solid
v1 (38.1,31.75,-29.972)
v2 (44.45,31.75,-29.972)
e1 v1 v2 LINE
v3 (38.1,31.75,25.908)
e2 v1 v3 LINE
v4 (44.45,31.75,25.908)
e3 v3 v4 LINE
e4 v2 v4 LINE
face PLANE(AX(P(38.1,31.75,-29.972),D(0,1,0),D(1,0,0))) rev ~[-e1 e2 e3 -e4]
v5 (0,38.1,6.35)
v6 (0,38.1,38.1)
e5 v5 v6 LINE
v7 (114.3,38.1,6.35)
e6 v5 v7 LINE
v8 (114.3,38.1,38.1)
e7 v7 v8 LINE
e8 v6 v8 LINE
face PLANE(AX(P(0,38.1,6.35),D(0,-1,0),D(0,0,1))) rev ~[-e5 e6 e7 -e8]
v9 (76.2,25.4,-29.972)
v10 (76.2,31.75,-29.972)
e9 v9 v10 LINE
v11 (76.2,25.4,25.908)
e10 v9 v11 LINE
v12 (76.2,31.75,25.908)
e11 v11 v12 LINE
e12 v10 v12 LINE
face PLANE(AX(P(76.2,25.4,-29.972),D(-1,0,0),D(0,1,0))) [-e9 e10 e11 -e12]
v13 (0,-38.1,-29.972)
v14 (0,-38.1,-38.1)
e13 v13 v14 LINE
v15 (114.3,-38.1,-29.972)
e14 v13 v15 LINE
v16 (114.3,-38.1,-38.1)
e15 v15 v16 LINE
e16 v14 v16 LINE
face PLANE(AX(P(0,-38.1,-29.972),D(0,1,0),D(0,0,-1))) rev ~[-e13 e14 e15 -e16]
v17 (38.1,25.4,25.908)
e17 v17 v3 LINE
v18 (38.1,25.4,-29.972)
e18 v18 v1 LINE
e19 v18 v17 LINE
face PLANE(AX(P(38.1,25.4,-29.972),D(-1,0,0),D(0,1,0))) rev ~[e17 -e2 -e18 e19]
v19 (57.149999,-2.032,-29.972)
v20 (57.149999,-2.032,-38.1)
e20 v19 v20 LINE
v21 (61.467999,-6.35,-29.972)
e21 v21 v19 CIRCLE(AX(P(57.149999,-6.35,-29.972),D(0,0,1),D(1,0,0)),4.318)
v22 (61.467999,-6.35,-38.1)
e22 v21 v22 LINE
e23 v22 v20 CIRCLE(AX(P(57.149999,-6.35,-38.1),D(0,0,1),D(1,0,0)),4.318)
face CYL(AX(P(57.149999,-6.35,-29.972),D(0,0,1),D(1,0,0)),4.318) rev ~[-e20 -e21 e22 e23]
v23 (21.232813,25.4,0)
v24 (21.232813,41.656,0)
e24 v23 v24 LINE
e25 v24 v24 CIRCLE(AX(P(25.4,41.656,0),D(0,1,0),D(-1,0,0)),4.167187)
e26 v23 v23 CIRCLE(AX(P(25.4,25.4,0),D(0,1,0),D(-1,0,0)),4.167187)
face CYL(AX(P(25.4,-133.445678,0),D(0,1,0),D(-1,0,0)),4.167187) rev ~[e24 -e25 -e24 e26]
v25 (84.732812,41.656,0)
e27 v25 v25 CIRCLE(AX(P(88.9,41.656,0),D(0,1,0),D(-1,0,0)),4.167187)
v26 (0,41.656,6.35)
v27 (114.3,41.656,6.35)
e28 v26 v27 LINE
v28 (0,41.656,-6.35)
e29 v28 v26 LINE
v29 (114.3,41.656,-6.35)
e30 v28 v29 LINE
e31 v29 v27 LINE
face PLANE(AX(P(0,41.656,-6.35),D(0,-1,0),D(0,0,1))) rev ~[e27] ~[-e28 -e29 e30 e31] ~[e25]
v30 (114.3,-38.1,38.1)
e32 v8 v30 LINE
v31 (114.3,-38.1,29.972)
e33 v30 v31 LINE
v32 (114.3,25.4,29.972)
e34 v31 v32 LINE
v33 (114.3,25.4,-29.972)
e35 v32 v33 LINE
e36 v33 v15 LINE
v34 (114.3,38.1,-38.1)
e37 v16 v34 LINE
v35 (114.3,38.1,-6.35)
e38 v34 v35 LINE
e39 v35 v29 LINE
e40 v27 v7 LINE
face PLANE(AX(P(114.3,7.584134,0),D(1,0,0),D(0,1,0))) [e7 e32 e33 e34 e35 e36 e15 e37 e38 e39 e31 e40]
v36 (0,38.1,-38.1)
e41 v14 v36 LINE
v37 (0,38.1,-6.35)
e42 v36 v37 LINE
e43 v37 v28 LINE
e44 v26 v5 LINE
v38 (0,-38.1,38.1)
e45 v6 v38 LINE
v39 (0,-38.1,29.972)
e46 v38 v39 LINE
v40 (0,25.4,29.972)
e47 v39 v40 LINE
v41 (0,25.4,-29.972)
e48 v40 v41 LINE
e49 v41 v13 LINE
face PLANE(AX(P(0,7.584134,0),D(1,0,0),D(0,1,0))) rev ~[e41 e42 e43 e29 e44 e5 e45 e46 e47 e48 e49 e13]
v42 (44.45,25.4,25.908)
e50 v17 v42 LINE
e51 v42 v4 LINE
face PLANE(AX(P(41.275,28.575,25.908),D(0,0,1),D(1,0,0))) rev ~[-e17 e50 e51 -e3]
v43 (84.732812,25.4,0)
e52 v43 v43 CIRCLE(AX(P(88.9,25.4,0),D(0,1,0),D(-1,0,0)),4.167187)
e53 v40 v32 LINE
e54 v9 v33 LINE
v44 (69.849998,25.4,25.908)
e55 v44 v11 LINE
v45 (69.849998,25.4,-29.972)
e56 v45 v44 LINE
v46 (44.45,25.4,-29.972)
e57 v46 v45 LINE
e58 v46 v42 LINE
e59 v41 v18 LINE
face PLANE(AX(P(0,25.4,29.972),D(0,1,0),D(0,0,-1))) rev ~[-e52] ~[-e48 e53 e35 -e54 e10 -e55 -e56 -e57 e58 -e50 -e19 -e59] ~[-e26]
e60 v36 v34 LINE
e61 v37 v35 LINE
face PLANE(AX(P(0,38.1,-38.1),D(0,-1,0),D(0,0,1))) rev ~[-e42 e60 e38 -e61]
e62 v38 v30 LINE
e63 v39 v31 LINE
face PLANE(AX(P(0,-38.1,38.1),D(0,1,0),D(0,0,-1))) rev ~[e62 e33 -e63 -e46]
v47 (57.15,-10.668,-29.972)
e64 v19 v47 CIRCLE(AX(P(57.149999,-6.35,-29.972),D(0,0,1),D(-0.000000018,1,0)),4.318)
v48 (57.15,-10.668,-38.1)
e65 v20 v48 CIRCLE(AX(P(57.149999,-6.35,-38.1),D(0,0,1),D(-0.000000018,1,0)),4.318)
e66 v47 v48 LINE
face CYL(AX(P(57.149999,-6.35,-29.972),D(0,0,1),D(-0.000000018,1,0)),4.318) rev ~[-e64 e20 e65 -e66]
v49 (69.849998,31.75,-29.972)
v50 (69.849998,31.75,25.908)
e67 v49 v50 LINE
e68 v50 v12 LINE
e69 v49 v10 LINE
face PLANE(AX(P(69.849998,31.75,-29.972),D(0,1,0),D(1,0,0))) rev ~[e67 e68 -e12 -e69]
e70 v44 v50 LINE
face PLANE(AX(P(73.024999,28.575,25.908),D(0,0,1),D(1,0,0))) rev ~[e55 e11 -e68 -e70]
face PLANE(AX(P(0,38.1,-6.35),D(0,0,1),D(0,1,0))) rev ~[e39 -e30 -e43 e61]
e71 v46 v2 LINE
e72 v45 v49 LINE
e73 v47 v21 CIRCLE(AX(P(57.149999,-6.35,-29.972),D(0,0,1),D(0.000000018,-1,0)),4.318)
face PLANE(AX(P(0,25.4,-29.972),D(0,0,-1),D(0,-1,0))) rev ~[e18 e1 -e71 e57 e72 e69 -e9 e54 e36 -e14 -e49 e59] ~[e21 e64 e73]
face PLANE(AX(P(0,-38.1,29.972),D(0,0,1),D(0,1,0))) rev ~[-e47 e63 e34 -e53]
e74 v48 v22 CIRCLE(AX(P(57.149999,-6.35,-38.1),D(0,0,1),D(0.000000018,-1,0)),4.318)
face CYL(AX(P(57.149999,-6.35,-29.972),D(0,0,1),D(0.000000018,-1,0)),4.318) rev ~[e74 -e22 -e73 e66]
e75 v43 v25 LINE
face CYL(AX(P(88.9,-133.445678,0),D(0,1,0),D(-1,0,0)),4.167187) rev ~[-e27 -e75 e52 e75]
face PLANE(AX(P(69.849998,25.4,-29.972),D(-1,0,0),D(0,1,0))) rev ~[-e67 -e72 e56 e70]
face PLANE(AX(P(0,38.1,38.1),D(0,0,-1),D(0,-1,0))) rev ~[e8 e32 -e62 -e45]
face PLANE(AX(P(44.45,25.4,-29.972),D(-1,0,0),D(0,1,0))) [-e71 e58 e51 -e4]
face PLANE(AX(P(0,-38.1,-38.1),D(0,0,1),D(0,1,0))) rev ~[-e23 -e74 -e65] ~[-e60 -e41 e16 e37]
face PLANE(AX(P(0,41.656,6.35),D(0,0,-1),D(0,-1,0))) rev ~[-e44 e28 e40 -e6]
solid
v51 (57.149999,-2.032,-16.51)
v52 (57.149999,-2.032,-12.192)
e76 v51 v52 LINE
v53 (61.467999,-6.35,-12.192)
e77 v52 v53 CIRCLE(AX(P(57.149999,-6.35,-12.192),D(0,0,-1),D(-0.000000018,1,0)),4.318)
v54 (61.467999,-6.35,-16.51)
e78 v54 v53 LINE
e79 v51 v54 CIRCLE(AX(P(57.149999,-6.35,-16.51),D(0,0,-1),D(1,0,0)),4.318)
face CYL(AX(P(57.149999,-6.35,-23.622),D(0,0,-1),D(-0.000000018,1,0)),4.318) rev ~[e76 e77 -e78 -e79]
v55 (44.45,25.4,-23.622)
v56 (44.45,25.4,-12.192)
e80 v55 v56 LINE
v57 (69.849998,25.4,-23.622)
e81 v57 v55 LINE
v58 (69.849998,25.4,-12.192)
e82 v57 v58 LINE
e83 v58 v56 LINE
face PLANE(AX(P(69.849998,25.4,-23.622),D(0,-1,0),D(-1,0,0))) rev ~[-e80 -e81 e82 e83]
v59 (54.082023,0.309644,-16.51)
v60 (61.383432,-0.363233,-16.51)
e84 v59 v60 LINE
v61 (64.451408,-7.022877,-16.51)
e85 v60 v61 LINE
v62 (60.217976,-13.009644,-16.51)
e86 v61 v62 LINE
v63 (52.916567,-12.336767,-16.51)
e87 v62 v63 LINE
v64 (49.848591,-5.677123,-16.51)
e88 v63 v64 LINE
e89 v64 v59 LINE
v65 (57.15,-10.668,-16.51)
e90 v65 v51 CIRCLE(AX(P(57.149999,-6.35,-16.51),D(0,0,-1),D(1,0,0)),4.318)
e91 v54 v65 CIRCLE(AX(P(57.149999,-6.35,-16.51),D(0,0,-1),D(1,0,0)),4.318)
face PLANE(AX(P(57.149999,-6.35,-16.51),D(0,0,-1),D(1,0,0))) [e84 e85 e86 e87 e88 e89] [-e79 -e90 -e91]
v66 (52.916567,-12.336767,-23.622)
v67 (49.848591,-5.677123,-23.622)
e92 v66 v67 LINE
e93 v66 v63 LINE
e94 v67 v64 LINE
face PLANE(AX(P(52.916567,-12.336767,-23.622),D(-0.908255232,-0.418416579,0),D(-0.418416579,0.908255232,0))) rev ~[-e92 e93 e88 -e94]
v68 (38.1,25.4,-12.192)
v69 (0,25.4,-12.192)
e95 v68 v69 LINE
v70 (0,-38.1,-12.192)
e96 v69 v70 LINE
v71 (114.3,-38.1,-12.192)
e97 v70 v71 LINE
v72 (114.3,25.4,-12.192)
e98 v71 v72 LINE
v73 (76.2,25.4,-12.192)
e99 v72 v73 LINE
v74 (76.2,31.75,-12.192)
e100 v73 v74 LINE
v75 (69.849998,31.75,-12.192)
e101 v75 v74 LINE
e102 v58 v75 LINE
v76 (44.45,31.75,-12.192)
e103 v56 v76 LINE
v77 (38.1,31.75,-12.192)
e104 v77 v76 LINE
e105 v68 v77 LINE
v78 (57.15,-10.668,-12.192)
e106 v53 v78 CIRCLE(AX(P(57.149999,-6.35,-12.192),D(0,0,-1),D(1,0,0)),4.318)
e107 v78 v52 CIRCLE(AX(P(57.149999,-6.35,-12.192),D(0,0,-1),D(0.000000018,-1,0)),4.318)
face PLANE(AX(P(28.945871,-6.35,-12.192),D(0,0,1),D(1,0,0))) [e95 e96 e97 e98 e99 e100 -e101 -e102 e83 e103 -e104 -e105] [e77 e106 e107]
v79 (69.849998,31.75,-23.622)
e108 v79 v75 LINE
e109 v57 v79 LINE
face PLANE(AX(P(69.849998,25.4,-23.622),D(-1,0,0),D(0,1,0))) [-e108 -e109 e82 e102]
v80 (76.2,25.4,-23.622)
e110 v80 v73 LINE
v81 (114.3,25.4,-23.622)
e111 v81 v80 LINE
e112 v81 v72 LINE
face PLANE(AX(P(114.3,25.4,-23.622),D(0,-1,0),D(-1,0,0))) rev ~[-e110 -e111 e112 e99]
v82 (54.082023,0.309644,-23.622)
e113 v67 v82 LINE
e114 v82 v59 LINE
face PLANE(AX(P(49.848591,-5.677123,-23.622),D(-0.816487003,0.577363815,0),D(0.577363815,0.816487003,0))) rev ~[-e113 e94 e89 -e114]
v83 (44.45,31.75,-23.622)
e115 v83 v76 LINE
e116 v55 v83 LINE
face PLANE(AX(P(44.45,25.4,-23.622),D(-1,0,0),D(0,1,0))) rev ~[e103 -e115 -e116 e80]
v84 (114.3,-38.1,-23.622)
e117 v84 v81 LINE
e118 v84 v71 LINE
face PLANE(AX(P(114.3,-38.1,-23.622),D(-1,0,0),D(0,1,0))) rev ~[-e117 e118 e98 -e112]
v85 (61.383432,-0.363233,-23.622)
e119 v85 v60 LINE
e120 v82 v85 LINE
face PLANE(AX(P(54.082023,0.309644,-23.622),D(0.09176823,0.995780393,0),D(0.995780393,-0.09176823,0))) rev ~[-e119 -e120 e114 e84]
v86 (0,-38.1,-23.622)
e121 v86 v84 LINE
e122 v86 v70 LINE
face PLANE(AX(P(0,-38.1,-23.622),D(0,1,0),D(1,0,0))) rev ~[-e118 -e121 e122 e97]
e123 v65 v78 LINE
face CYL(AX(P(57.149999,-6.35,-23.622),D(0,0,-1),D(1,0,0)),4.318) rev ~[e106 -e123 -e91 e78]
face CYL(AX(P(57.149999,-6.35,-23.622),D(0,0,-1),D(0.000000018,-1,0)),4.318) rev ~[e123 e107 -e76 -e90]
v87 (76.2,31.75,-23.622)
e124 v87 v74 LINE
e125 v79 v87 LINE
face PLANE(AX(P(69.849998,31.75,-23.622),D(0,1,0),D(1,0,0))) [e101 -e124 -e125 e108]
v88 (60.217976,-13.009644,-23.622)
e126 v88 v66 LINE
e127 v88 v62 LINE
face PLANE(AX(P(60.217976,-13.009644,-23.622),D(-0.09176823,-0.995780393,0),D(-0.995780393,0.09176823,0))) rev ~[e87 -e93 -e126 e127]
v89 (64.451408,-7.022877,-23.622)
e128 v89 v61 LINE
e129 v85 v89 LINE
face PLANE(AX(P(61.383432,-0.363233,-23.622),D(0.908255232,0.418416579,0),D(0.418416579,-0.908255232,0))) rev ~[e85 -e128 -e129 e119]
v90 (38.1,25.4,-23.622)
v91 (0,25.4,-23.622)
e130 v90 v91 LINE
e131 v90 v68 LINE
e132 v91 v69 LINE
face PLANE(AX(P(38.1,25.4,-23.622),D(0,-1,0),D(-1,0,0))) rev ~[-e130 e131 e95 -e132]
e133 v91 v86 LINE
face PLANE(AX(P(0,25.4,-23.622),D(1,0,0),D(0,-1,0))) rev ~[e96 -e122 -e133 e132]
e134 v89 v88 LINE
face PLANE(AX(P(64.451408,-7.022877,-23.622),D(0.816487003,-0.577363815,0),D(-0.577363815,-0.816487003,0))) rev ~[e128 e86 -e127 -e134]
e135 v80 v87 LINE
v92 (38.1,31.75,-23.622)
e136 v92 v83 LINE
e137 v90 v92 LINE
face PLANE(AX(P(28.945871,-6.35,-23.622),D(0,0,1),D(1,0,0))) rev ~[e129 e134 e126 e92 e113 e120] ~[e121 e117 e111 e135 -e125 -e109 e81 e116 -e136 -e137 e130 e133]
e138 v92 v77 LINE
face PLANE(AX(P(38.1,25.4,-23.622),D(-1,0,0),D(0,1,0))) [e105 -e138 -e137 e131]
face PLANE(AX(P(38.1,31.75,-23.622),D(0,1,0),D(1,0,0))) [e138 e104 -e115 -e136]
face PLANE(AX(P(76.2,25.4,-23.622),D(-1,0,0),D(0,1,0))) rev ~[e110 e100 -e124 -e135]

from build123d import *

# Parameters (mm, degrees)
F1_DEPTH = 114.3
F3_D     = 8.334375
F5_DEPTH = 12.7
F4_W     = 6.35
F4_H     = 6.35
F4_W_2   = 6.3500022411
F6_DEPTH = 55.88
F7_START = 6.35
F7_DEPTH = 11.43
F8_R     = 4.318
F9_DEPTH = 7.112


# Not quite as in the source:
# - a length typed as a fraction of an inch, garbled in the dataset ("3 / 203.2 mm" for 3/8 in), is restored


with BuildPart() as f1:
    # F0 (on Right) → F1 (new body)
    with BuildSketch(Plane.YZ):
        Polygon((-38.1, -29.972), (-38.1, -38.1), (38.1, -38.1), (38.1, -6.35), (41.656, -6.35), (41.656, 6.35), (38.1, 6.35), (38.1, 38.1), (-38.1, 38.1), (-38.1, 29.972), (25.4, 29.972), (25.4, 2.3702074885), (25.4, -29.972), align=None)
    extrude(amount=F1_DEPTH)

    # F3 (through all)
    with Locations(Plane.XZ.offset(-25.4)):
        with Locations((25.4, 0), (88.9, 0)):
            Hole(F3_D / 2)

    # F4 (on face) → F5 (cut)
    with BuildSketch(Plane.XY.offset(-29.972)):
        with BuildLine():
            ThreePointArc((57.1499993635, -2.032), (52.8319994397, -6.3500000762), (57.1499995159, -10.668))
            Line((57.1499995159, -10.668), (57.1499993635, -2.032))
        make_face()
        with BuildLine():
            Line((57.1499993635, -2.032), (57.1499995159, -10.668))
            ThreePointArc((57.1499995159, -10.668), (60.2032865478, -9.4032870542), (61.4679994397, -6.35))
            ThreePointArc((61.4679994397, -6.35), (60.2032864939, -3.2967128919), (57.1499993635, -2.032))
        make_face()
    extrude(amount=-F5_DEPTH, mode=Mode.SUBTRACT)

    # F4 (on face) → F6 (cut)
    with BuildSketch(Plane.XY.offset(-29.972)):
        with Locations((41.275, 28.575)):
            Rectangle(F4_W, F4_H)
        with Locations((73.0249988794, 28.575)):
            Rectangle(F4_W_2, F4_H)
    extrude(amount=F6_DEPTH, mode=Mode.SUBTRACT)


with BuildPart() as f7:
    # F4 (on face) → F7 (new body)
    with BuildSketch(Plane.XY.offset(-29.972).offset(F7_START)):
        with BuildLine():
            Line((0, -38.1), (57.15, -38.1))
            Line((57.15, -38.1), (57.1499995159, -10.668))
            ThreePointArc((57.1499995159, -10.668), (52.8319994397, -6.3500000762), (57.1499993635, -2.032))
            Line((57.1499993635, -2.032), (57.1499988794, 25.4))
            Line((57.1499988794, 25.4), (44.45, 25.4))
            Line((44.45, 25.4), (38.1, 25.4))
            Line((38.1, 25.4), (0, 25.4))
            Line((0, 25.4), (0, -38.1))
        make_face()
        with Locations((41.275, 28.575)):
            Rectangle(F4_W, F4_H)
        with Locations((73.0249988794, 28.575)):
            Rectangle(F4_W_2, F4_H)
        with BuildLine():
            Line((114.3, -38.1), (114.3, 25.4))
            Line((114.3, 25.4), (76.2, 25.4))
            Line((76.2, 25.4), (69.8499977589, 25.4))
            Line((69.8499977589, 25.4), (57.1499988794, 25.4))
            Line((57.1499988794, 25.4), (57.1499993635, -2.032))
            ThreePointArc((57.1499993635, -2.032), (60.2032864939, -3.2967128919), (61.4679994397, -6.35))
            ThreePointArc((61.4679994397, -6.35), (60.2032865478, -9.4032870542), (57.1499995159, -10.668))
            Line((57.1499995159, -10.668), (57.15, -38.1))
            Line((57.15, -38.1), (114.3, -38.1))
        make_face()
    extrude(amount=F7_DEPTH)

    # F8 (on face) → F9 (cut)
    with BuildSketch(Plane(origin=(0, 0, -23.622), x_dir=(1, 0, 0), z_dir=(0, 0, -1))):
        Polygon((60.2179755791, 13.0096438149), (52.9165667855, 12.3367671824), (49.8485906462, 5.6771233675), (54.0820233003, -0.3096438149), (61.3834320939, 0.3632328176), (64.4514082333, 7.0228766325), align=None)
        with Locations((57.1499994397, 6.35)):
            Circle(F8_R, mode=Mode.SUBTRACT)
    extrude(amount=-F9_DEPTH, mode=Mode.SUBTRACT)


solid = Compound([f1.part, f7.part])
